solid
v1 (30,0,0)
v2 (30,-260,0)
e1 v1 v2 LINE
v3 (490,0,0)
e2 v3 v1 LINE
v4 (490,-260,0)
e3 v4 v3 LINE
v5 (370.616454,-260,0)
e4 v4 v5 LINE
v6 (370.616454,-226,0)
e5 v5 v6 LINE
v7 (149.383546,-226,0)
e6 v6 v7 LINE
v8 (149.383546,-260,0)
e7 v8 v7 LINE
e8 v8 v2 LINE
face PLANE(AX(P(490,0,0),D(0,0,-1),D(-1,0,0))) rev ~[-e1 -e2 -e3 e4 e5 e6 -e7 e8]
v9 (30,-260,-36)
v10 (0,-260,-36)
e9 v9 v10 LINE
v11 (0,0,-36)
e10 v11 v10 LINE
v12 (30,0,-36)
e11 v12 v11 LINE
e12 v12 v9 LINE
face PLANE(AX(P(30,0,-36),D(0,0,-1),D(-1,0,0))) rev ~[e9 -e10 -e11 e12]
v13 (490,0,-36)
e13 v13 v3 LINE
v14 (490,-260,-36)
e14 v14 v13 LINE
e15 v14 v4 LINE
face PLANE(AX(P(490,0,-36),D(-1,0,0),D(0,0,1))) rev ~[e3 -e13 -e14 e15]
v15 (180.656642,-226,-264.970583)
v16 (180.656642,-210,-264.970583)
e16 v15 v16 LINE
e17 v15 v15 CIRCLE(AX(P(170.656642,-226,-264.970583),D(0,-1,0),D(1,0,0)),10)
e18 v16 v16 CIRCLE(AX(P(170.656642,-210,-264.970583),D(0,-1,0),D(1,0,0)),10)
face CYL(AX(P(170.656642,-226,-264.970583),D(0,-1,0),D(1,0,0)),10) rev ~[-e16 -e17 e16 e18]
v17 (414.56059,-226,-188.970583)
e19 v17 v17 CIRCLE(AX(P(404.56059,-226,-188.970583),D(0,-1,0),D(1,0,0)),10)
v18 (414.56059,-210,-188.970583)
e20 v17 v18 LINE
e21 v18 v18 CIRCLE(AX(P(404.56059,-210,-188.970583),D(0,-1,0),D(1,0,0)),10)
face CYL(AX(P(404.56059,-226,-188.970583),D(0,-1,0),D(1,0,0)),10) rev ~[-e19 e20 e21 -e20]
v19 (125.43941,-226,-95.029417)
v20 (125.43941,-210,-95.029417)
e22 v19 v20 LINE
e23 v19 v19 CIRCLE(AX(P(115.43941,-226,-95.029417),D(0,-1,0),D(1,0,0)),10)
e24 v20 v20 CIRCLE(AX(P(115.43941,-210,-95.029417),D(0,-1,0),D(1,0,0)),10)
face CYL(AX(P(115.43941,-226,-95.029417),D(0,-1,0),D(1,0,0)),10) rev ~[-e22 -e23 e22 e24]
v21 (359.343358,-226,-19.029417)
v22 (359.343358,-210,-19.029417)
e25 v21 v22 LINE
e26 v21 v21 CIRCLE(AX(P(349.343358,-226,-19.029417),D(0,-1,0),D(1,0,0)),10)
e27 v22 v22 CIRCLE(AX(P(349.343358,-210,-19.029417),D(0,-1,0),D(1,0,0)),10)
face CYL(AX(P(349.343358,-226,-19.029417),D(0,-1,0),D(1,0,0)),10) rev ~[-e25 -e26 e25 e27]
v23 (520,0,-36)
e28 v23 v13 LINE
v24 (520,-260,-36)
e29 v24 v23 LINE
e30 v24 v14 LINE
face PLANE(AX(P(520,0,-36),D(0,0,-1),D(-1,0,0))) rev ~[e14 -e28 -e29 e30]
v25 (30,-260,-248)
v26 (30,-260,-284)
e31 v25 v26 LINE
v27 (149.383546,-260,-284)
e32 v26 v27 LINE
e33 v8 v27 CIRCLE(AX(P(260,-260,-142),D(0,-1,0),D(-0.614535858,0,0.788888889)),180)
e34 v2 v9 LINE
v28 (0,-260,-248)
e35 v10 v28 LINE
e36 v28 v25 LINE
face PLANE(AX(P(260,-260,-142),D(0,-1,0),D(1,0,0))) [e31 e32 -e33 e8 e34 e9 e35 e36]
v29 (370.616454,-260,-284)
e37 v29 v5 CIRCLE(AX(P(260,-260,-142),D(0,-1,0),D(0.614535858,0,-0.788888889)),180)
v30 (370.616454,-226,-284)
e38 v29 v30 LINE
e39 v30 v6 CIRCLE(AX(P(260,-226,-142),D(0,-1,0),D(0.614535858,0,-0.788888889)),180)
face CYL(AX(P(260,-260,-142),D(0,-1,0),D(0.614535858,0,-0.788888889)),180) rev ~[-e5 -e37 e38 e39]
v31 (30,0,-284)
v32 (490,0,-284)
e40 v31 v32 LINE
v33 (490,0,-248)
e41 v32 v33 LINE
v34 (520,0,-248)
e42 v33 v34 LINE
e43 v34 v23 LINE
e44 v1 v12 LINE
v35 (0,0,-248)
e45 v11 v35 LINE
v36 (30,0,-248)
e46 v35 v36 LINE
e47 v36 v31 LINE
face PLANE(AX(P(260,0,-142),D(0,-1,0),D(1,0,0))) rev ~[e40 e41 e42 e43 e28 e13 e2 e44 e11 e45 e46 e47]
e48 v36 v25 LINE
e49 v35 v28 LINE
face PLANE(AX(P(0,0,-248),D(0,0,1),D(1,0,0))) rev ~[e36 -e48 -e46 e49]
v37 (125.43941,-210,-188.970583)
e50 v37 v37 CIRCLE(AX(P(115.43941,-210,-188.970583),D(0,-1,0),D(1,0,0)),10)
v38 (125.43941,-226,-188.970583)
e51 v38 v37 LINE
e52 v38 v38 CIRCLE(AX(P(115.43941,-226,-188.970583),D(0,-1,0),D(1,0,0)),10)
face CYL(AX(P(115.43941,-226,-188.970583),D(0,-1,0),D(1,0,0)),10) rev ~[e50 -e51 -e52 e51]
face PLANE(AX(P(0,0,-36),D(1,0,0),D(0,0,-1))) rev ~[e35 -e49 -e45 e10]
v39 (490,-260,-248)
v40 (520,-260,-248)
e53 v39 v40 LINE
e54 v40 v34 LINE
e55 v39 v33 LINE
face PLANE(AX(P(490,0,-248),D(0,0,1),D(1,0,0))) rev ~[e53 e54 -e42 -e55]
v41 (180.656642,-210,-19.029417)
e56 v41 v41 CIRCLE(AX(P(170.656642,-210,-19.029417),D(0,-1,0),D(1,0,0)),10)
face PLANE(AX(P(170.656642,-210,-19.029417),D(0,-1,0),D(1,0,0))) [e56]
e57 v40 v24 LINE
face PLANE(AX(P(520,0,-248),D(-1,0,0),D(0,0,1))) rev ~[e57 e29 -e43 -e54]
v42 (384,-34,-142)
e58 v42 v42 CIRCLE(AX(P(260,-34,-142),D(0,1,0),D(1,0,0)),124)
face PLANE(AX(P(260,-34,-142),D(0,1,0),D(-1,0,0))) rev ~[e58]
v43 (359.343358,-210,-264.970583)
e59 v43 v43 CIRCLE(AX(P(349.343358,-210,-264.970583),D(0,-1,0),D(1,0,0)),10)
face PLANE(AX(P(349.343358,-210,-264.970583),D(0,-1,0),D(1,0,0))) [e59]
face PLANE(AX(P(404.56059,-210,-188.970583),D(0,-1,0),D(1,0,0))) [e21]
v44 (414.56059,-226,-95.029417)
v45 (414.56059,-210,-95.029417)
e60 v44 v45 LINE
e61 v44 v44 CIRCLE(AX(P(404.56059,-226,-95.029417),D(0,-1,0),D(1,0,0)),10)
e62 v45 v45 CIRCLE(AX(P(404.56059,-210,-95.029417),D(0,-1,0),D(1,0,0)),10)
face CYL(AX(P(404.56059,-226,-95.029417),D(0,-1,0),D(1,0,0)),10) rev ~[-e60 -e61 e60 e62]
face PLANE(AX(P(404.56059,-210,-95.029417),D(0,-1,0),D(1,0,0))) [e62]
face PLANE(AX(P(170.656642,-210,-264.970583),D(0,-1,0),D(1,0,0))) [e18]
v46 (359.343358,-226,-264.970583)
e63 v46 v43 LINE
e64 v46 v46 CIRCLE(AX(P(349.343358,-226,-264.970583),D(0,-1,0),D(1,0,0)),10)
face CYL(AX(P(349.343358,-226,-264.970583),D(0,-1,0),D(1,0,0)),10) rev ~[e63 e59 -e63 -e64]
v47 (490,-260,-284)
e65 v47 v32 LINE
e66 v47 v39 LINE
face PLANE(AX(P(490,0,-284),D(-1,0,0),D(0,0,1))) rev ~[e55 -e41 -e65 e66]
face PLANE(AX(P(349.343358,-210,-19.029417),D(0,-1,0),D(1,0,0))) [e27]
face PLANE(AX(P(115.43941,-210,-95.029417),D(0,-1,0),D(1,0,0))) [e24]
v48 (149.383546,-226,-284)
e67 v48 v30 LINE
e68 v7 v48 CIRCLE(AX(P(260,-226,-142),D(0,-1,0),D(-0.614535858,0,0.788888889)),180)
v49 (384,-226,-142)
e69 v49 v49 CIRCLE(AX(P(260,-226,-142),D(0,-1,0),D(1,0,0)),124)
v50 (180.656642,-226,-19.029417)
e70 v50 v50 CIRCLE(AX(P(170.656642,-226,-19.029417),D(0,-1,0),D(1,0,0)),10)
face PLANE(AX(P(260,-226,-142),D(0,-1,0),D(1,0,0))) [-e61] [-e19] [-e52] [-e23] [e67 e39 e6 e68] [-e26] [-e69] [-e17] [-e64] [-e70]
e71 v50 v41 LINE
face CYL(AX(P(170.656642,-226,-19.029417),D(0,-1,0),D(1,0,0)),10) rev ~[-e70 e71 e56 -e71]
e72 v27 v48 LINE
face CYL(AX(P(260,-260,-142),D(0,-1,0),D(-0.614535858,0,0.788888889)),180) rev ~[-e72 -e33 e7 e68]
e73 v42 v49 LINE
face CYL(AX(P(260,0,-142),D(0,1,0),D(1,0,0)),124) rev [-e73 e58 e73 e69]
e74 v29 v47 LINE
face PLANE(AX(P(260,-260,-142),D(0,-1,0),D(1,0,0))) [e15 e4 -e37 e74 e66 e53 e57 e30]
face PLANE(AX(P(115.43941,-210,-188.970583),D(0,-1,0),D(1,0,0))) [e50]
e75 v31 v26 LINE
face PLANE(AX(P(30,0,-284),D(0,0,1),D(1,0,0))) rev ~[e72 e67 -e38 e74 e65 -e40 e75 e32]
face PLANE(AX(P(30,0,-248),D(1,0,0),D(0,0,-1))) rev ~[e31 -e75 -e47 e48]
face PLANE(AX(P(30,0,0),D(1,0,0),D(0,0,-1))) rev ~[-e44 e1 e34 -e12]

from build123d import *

# Parameters (mm, degrees)
F0_R     = 124
F1_DEPTH = 260
F2_R     = 124
F3_DEPTH = 34
F4_R     = 124
F5_DEPTH = 34
F6_R     = 10
F7_DEPTH = 16


with BuildPart() as f1:
    # F0 (on Front) → F1 (new body)
    with BuildSketch(Plane.XZ):
        Polygon((490, 0), (30, 0), (30, -36), (0, -36), (0, -248), (30, -248), (30, -284), (490, -284), (490, -248), (520, -248), (520, -36), (490, -36), align=None)
        with Locations((260, -142)):
            Circle(F0_R, mode=Mode.SUBTRACT)
    extrude(amount=F1_DEPTH)

    # F2 (on face) → F3 (cut)
    with BuildSketch(Plane.XZ.offset(260)):
        with BuildLine():
            Line((149.3835455278, -284), (370.6164544722, -284))
            ThreePointArc((370.6164544722, -284), (440, -142), (370.6164544722, 0))
            Line((370.6164544722, 0), (149.3835455278, 0))
            ThreePointArc((149.3835455278, 0), (80, -142), (149.3835455278, -284))
        make_face()
        with Locations((260, -142)):
            Circle(F2_R, mode=Mode.SUBTRACT)
    extrude(amount=-F3_DEPTH, mode=Mode.SUBTRACT)

    # F4 (on face) → F5 (join)
    with BuildSketch(Plane(origin=(0, 0, 0), x_dir=(-1, 0, 0), z_dir=(0, 1, 0))):
        Polygon((-30, -36), (-30, 0), (-490, 0), (-490, -36), (-520, -36), (-520, -248), (-490, -248), (-490, -284), (-30, -284), (-30, -248), (0, -248), (0, -36), align=None)
        with Locations((-260, -142)):
            Circle(F4_R, mode=Mode.SUBTRACT)
        with Locations((-260, -142)):
            Circle(F4_R)
    extrude(amount=-F5_DEPTH)

    # F6 (on face) → F7 (cut)
    with BuildSketch(Plane.XZ.offset(226)):
        with Locations((170.6566416515, -19.029416855)):
            Circle(F6_R)
        with Locations((115.4394095231, -95.029416855)):
            Circle(F6_R)
        with Locations((115.4394095231, -188.970583145)):
            Circle(F6_R)
        with Locations((170.6566416515, -264.970583145)):
            Circle(F6_R)
        with Locations((349.3433583485, -264.970583145)):
            Circle(F6_R)
        with Locations((404.5605904769, -188.970583145)):
            Circle(F6_R)
        with Locations((404.5605904769, -95.029416855)):
            Circle(F6_R)
        with Locations((349.3433583485, -19.029416855)):
            Circle(F6_R)
    extrude(amount=-F7_DEPTH, mode=Mode.SUBTRACT)


solid = f1.part
